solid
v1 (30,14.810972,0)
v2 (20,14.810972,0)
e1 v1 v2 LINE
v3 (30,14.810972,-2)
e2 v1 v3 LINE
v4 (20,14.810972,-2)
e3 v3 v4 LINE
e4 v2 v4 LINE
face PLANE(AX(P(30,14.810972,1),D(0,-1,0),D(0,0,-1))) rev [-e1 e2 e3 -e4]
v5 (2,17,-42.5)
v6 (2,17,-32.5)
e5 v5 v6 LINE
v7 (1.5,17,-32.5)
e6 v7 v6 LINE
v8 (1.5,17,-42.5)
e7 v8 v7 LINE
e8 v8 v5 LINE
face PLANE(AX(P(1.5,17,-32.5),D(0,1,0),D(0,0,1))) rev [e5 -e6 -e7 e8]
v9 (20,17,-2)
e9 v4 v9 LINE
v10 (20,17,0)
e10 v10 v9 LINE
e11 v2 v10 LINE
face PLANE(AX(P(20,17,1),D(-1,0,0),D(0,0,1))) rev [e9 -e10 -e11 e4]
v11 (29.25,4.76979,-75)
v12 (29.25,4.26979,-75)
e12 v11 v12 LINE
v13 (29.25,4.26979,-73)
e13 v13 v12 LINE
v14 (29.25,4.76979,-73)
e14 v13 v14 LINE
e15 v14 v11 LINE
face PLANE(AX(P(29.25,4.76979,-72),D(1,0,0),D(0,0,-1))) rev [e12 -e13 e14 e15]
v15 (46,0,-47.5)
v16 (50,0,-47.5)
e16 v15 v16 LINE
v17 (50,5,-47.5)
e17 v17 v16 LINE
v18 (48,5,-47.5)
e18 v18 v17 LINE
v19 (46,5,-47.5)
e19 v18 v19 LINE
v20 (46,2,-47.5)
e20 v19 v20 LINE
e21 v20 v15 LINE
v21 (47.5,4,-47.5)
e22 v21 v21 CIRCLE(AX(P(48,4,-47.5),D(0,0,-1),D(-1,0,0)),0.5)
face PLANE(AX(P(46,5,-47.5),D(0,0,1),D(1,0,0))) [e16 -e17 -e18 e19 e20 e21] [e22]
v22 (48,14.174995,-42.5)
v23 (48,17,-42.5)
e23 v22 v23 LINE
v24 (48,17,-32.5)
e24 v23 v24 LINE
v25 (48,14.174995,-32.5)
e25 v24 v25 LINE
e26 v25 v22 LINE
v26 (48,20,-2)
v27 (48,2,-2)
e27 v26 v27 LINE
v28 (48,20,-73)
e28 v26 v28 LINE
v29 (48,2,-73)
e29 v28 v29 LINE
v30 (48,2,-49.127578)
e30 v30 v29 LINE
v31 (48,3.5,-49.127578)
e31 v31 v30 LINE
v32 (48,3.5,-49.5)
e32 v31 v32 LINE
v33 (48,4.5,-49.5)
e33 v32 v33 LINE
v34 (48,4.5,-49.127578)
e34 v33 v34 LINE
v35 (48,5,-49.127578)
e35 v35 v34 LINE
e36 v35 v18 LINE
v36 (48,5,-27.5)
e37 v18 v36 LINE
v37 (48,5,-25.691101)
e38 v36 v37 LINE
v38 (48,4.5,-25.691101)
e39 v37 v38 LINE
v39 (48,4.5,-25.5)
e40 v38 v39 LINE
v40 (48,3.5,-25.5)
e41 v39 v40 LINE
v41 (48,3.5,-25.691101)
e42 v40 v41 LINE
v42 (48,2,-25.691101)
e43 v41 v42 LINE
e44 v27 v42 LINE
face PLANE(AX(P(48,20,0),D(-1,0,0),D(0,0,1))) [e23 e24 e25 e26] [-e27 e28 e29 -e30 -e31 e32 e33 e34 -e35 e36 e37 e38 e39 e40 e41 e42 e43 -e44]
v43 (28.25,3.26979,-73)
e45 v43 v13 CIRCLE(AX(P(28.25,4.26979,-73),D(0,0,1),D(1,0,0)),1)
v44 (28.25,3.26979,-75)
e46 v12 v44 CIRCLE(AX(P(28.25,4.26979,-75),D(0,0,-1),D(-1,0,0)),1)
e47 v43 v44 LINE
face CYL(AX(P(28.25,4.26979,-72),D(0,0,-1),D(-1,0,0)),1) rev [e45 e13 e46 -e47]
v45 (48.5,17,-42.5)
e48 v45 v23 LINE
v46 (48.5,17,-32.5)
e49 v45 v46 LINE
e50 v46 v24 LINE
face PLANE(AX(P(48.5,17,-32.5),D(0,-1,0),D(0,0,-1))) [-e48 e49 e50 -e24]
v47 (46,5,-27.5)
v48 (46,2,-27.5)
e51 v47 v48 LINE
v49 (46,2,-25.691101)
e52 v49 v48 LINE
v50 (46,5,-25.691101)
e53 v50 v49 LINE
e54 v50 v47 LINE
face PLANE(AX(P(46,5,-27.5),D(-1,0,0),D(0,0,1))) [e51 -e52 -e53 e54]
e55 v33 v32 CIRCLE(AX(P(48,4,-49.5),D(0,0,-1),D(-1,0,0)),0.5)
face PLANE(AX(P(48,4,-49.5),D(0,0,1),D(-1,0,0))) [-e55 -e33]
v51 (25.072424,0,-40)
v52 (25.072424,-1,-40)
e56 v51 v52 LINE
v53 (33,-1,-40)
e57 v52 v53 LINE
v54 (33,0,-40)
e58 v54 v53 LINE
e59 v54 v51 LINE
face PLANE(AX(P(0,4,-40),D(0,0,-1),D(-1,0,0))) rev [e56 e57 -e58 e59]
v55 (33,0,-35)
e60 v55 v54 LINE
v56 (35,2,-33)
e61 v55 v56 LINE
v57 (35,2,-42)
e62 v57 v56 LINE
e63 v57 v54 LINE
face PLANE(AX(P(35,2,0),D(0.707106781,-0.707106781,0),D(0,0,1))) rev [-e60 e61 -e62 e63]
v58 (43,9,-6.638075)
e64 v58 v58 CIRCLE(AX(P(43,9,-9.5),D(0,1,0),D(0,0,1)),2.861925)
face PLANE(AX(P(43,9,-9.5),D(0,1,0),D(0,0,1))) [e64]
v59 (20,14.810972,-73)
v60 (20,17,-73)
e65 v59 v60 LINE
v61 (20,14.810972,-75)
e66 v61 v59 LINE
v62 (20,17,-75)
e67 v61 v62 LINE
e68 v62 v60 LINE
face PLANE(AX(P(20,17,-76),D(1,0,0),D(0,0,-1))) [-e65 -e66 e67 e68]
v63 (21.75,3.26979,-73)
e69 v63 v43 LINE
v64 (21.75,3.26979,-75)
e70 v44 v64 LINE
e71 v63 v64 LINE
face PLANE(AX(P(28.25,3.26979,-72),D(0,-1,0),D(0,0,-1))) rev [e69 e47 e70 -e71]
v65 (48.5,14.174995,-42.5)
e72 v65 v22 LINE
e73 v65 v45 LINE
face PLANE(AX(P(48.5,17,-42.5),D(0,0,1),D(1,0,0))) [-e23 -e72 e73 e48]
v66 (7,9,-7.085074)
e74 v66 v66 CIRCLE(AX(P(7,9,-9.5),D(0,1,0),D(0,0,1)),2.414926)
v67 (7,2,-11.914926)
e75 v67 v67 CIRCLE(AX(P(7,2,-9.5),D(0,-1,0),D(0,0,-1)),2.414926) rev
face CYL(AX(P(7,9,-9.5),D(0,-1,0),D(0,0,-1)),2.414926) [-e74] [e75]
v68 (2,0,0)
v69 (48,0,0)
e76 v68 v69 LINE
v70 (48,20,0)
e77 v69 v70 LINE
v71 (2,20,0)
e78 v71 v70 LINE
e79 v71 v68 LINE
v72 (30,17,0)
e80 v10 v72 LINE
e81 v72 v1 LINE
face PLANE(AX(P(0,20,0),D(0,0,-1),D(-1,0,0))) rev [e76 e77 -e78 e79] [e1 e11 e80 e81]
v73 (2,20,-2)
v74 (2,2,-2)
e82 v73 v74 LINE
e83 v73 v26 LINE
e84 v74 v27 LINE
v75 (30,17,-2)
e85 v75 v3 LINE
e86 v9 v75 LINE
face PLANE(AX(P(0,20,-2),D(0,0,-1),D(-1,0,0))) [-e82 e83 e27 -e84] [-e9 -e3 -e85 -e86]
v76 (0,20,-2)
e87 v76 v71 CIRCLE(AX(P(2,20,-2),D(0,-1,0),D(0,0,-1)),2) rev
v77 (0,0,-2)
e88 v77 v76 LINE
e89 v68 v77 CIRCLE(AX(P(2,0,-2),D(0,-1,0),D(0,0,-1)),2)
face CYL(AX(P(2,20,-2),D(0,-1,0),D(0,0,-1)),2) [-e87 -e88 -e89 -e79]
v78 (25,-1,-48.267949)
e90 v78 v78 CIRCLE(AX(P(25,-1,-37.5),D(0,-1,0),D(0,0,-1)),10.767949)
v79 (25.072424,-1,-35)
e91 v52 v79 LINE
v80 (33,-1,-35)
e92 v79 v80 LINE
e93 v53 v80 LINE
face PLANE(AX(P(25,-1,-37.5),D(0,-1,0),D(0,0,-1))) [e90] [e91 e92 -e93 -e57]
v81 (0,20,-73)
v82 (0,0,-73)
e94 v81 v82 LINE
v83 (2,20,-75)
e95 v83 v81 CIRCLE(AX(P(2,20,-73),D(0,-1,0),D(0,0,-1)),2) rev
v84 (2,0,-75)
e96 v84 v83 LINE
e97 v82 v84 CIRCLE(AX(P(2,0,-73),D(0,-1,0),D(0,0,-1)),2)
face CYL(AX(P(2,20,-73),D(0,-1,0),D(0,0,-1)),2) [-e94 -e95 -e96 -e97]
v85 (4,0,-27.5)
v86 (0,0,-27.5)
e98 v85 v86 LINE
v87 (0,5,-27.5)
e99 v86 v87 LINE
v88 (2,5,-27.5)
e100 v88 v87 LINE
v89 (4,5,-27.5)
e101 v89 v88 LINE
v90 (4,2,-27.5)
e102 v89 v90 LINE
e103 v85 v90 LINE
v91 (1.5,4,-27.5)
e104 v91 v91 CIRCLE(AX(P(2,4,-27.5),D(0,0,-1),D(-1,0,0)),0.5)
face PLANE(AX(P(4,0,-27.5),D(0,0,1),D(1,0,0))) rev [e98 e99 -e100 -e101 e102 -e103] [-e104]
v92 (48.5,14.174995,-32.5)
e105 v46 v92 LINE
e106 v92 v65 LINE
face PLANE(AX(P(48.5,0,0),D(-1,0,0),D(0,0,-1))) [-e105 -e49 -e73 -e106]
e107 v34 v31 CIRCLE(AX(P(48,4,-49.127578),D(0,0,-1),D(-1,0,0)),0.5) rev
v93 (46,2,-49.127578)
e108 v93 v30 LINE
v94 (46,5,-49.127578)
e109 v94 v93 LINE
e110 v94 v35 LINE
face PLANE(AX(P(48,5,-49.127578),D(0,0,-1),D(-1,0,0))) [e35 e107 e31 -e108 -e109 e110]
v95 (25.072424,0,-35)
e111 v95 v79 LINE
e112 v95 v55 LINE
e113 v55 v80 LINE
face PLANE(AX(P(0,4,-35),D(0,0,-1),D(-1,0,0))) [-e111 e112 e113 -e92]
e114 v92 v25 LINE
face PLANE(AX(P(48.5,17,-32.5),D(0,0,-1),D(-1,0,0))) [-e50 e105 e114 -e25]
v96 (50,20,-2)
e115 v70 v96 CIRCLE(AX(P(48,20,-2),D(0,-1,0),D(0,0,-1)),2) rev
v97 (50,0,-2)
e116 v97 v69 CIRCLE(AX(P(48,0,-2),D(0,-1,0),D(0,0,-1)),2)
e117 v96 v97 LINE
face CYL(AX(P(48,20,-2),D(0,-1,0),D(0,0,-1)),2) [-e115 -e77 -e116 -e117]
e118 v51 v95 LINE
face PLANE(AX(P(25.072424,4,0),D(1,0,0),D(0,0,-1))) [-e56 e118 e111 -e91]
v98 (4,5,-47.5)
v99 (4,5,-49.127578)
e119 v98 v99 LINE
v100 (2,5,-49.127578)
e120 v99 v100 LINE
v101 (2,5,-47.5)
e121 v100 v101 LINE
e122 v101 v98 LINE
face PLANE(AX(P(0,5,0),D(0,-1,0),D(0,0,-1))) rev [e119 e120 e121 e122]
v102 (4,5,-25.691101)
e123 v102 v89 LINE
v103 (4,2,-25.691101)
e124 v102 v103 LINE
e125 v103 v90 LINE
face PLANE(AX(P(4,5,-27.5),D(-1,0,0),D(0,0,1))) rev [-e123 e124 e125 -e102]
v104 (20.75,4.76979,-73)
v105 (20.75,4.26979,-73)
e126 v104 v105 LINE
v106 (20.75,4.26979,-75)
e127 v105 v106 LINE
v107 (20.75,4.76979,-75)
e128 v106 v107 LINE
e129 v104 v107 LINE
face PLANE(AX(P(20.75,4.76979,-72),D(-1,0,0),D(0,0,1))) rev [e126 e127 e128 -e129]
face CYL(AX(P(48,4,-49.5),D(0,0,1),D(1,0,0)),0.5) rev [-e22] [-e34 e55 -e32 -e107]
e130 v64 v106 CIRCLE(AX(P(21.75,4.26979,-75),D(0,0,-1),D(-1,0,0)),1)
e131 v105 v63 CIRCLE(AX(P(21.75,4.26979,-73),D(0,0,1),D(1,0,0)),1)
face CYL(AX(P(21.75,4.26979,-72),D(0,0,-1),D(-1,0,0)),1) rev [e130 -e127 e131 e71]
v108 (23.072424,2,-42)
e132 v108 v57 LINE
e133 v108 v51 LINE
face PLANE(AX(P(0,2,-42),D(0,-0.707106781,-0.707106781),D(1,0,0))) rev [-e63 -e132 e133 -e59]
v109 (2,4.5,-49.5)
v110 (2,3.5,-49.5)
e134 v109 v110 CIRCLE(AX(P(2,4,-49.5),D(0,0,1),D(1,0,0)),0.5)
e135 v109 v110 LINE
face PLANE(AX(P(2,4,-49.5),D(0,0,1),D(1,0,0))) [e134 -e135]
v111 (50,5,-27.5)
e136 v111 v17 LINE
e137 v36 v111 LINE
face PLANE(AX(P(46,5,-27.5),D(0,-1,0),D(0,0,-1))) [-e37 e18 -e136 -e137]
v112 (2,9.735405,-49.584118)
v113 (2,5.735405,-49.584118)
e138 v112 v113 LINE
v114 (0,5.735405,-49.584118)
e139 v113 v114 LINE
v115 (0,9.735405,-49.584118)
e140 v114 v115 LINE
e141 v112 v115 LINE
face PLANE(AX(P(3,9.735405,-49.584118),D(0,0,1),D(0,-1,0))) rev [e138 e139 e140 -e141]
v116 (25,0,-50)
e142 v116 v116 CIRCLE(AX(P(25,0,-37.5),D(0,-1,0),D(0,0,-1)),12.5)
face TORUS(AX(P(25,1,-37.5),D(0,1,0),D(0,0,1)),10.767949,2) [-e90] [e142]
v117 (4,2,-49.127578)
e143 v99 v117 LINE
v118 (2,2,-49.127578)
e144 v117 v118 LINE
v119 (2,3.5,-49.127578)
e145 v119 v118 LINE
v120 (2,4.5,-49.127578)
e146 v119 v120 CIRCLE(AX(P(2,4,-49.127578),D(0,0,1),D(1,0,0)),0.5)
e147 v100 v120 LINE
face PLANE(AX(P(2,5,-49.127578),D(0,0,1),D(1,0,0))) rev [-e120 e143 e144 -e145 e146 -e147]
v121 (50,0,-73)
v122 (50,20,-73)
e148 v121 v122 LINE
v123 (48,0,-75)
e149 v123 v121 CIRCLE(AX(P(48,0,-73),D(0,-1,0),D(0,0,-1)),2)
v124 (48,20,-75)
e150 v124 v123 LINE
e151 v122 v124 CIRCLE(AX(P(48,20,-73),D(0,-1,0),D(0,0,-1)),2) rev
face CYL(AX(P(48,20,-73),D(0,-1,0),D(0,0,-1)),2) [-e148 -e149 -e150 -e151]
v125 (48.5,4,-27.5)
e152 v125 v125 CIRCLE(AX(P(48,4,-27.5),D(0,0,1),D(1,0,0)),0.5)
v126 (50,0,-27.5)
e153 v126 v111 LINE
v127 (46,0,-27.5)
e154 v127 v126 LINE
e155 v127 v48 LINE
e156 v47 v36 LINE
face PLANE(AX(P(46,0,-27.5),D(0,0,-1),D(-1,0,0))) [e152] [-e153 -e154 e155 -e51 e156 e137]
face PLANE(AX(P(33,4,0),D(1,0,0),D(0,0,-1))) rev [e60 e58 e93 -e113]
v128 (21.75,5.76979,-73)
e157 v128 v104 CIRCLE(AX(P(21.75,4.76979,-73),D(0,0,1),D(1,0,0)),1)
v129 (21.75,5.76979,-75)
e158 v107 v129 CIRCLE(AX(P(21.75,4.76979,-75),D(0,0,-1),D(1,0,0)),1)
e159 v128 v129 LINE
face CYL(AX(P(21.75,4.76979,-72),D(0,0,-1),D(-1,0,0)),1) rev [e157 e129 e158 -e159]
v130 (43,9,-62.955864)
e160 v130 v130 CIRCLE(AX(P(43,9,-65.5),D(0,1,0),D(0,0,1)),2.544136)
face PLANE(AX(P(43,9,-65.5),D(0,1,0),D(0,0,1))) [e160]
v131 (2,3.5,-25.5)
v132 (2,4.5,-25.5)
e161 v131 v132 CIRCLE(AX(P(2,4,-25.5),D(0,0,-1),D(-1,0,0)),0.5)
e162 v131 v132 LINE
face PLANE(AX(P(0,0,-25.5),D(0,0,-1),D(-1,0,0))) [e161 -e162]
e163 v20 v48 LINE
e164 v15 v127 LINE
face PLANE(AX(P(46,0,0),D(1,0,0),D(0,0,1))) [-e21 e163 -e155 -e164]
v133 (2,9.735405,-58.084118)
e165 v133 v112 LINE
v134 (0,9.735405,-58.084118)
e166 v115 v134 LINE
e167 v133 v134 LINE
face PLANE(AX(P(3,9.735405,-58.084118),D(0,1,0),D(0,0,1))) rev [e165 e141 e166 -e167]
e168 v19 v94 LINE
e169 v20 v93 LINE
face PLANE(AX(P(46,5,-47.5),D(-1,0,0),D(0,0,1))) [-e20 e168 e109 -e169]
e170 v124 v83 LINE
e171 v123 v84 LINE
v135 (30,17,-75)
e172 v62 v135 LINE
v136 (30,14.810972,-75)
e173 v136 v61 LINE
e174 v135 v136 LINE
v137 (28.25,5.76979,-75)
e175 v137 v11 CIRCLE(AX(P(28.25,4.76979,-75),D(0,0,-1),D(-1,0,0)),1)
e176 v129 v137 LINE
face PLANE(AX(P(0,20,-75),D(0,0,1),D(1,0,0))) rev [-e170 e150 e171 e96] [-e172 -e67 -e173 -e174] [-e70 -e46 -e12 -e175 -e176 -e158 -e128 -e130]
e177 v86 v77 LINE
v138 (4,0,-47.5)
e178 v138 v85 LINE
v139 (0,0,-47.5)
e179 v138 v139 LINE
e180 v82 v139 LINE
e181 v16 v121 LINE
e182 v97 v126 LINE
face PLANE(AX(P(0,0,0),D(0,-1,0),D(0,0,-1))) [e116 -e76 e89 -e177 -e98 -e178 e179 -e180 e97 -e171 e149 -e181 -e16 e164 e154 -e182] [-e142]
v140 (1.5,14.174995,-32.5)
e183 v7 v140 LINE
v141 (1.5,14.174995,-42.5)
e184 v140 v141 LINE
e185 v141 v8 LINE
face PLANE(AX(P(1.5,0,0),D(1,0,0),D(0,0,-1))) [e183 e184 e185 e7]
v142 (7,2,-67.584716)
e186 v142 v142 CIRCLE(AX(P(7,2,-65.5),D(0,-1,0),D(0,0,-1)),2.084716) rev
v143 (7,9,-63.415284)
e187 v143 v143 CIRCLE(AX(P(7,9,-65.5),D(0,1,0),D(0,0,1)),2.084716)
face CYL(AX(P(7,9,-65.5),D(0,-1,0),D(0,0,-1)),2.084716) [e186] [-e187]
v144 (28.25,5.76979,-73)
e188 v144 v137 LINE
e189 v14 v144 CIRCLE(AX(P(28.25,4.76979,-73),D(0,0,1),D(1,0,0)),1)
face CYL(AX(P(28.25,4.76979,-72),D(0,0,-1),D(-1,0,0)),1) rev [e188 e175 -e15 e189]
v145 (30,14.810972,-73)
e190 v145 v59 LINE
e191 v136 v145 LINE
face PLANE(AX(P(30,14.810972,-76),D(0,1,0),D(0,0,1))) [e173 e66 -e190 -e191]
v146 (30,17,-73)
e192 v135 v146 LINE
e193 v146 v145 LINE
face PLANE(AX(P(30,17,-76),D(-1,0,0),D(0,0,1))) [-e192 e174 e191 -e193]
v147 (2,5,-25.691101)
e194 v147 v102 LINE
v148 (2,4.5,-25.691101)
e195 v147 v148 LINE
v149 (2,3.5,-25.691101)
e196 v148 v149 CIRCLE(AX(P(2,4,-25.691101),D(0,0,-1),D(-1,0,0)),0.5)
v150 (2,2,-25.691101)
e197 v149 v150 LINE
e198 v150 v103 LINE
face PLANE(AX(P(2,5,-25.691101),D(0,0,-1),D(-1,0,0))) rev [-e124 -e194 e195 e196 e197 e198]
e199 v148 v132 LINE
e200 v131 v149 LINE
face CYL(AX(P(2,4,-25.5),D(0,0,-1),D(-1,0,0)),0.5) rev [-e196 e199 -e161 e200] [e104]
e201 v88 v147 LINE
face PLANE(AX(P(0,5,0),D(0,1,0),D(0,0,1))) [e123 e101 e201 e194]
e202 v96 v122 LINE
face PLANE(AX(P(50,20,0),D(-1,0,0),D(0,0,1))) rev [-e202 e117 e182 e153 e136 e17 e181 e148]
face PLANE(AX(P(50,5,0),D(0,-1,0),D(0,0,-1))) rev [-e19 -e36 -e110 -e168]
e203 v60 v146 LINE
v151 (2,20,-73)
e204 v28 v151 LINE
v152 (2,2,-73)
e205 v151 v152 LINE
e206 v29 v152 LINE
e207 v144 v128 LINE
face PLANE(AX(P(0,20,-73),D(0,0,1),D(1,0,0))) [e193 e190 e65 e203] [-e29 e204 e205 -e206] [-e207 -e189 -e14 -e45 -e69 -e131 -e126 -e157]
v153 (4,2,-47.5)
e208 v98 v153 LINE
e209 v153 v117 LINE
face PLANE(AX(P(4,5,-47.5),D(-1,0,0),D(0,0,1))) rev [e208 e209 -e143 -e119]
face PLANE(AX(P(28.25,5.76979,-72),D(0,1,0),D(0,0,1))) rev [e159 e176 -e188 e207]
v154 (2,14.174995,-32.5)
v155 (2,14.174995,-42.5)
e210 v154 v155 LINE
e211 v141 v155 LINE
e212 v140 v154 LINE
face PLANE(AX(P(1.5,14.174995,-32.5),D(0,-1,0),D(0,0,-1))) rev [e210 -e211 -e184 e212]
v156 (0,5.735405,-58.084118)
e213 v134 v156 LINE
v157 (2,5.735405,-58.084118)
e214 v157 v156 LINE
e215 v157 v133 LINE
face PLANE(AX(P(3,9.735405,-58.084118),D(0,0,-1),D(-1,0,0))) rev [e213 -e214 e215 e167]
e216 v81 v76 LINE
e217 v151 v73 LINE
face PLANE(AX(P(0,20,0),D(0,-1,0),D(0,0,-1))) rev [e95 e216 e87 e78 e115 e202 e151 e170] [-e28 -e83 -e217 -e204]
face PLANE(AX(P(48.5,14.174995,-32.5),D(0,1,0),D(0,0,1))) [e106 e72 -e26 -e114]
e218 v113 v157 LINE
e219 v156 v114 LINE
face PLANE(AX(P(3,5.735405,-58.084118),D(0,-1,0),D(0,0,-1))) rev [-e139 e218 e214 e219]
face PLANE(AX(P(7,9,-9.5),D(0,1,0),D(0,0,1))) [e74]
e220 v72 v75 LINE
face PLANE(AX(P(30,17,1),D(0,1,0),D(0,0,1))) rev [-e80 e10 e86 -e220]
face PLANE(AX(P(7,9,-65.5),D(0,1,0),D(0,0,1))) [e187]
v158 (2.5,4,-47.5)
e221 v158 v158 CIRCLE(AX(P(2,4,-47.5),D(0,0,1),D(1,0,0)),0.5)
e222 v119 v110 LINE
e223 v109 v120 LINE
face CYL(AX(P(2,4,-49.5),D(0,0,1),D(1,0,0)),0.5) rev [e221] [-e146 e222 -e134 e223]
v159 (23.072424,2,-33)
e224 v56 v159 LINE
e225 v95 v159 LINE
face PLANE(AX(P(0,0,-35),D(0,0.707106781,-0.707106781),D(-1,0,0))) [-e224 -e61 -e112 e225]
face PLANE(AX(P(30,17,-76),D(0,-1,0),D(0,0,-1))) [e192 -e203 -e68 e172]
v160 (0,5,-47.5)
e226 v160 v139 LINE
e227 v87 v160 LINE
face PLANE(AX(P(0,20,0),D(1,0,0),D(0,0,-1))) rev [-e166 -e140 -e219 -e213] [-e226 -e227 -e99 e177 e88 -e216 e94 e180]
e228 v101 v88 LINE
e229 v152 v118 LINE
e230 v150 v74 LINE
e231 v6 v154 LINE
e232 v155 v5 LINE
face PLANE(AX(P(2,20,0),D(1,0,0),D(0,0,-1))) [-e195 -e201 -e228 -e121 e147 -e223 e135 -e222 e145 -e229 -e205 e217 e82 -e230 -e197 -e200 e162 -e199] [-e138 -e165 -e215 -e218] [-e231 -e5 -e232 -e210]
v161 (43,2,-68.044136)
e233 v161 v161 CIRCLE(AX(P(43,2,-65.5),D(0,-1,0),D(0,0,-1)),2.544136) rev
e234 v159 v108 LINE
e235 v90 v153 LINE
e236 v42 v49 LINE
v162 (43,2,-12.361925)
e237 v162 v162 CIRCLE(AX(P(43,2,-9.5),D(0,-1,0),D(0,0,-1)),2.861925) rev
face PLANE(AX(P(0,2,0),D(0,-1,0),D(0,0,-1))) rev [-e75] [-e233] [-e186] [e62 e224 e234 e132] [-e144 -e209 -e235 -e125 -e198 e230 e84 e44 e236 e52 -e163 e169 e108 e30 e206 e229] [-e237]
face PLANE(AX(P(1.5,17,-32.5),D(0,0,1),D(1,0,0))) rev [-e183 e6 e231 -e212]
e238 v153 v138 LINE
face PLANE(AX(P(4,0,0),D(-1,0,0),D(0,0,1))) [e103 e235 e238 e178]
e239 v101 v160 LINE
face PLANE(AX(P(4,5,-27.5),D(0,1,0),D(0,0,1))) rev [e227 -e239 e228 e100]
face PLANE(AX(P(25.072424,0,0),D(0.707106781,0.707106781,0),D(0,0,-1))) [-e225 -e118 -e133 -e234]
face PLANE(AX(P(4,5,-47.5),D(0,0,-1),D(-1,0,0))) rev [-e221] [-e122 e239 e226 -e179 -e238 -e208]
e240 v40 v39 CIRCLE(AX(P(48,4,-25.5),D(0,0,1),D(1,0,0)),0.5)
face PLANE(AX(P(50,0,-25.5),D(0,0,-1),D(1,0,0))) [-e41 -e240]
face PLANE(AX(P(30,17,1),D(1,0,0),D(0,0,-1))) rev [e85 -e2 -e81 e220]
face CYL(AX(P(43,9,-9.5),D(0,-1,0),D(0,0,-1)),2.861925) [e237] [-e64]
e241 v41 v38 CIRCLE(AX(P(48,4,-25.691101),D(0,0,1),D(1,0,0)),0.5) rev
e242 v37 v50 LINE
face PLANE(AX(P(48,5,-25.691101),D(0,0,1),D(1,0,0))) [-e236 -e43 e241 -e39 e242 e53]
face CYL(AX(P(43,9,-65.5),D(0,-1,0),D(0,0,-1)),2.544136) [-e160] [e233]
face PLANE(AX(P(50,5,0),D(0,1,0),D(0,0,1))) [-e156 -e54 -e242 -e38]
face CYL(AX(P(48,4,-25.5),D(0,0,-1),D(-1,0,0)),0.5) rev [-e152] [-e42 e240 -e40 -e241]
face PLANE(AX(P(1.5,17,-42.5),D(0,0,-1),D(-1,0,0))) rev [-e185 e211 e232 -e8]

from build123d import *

# Parameters (mm, degrees)
SKETCH1_W           = 50
SKETCH1_H           = 75
BOSS_EXTRUDE1_DEPTH = 20
SHELL1_T            = -2
FILLET1_R           = 2
SKETCH2_R           = 12.5
BOSS_EXTRUDE2_DEPTH = 1
FILLET2_R           = 2
CUT_EXTRUDE1_DEPTH  = 5
SKETCH4_R           = 2.084715902
SKETCH4_R_2         = 2.544136108
SKETCH4_R_3         = 2.861924979
SKETCH4_R_4         = 2.414925707
BOSS_EXTRUDE3_DEPTH = 7
CHAMFER1_SIZE       = 2
CUT_EXTRUDE2_DEPTH  = 4
SKETCH7_W           = 2
SKETCH7_H           = 1.627577662
BOSS_EXTRUDE4_DEPTH = 3
SKETCH8_W           = 2
SKETCH8_H           = 1.808898565
BOSS_EXTRUDE5_DEPTH = 3
SKETCH9_R           = 0.5
CUT_EXTRUDE3_DEPTH  = 2
CUT_EXTRUDE4_START  = -2
CUT_EXTRUDE4_DEPTH  = 2
SKETCH12_W          = 8.5
SKETCH12_H          = 4
CUT_EXTRUDE5_DEPTH  = 3
SKETCH14_W          = 10
SKETCH14_H          = 2.18902829
CUT_EXTRUDE7_DEPTH  = 3
SKETCH15_W          = 10
SKETCH15_H          = 2.825004844
CUT_EXTRUDE8_DEPTH  = 0.5
CUT_EXTRUDE9_DEPTH  = 3


with BuildPart() as part:
    # Sketch1 → Boss-Extrude1 (new body)
    with BuildSketch(Plane(origin=(0, 0, 0), x_dir=(1, 0, 0), z_dir=(0, 1, 0))):
        with Locations((25, 37.5)):
            Rectangle(SKETCH1_W, SKETCH1_H)
    extrude(amount=BOSS_EXTRUDE1_DEPTH)

    # Shell1
    shell1_openings = [part.faces().sort_by_distance(p)[0] for p in [
        (25, 20, -37.5),
    ]]
    offset(amount=SHELL1_T, openings=shell1_openings, kind=Kind.INTERSECTION)

    # Fillet1
    fillet1_edges = [part.edges().sort_by_distance(p)[0] for p in [
        (0, 10, -75),
        (50, 10, -75),
        (50, 10, 0),
        (0, 10, 0),
    ]]
    fillet(fillet1_edges, radius=FILLET1_R)

    # Sketch2 → Boss-Extrude2 (add)
    with BuildSketch(Plane.XZ):
        with Locations(Location((25, -37.5, 0), (0, 0, 270))):
            Circle(SKETCH2_R)
    extrude(amount=BOSS_EXTRUDE2_DEPTH)

    # Fillet2
    # the kernel refuses this fillet: 2 mm, written as the material it takes off along each edge
    with BuildSketch(Plane(origin=(25, -1, -37.5), x_dir=(0, 0, -1), z_dir=(-1, 0, 0))) as fillet2_piece_1:
        with BuildLine():
            CenterArc((10.767949192, -2), FILLET2_R, 30, 60)
            Line((10.767949192, 0), (10.767949192, 0.04))
            Line((10.767949192, 0.04), (12.5, 0.04))
            Line((12.5, 0.04), (12.54, 0))
            ThreePointArc((12.54, 0), (12.54, -0.5), (12.534641016, -0.98))
            Line((12.534641016, -0.98), (12.5, -1))
        make_face()
    revolve(axis=Axis((25, -1, -37.5), (0, -1, 0)), mode=Mode.SUBTRACT)

    # Sketch3 → Cut-Extrude1 (cut)
    with BuildSketch(Plane.XZ.offset(1)):
        Polygon((33, -40), (33, -37.5), (33, -35), (25.072423756, -35), (25.072423756, -37.5), (25.072423756, -40), align=None)
    extrude(amount=-CUT_EXTRUDE1_DEPTH, mode=Mode.SUBTRACT)

    # Sketch4 → Boss-Extrude3 (add)
    with BuildSketch(Plane(origin=(0, 2, 0), x_dir=(1, 0, 0), z_dir=(0, 1, 0))):
        with Locations(Location((7, 65.5, 0), (0, 0, 90))):
            Circle(SKETCH4_R)
        with Locations(Location((43, 65.5, 0), (0, 0, 90))):
            Circle(SKETCH4_R_2)
        with Locations(Location((43, 9.5, 0), (0, 0, 90))):
            Circle(SKETCH4_R_3)
        with Locations(Location((7, 9.5, 0), (0, 0, 90))):
            Circle(SKETCH4_R_4)
    extrude(amount=BOSS_EXTRUDE3_DEPTH)

    # Chamfer1
    chamfer1_edges = [part.edges().sort_by_distance(p)[0] for p in [
        (33, 2, -37.5),
        (29.036211878, 2, -40),
        (29.036211878, 2, -35),
        (25.072423756, 2, -37.5),
    ]]
    chamfer(chamfer1_edges, length=CHAMFER1_SIZE)

    # Sketch5 → Cut-Extrude2 (cut)
    with BuildSketch(Plane.ZY):
        Polygon((-37.5, 0), (-27.5, 0), (-27.5, 5), (-47.5, 5), (-47.5, 0), align=None)
    cut_extrude2 = extrude(amount=-CUT_EXTRUDE2_DEPTH, mode=Mode.SUBTRACT)

    # Sketch7 → Boss-Extrude4 (add)
    with BuildSketch(Plane(origin=(0, 2, 0), x_dir=(1, 0, 0), z_dir=(0, 1, 0))):
        with Locations((3, 48.313788831)):
            Rectangle(SKETCH7_W, SKETCH7_H)
    boss_extrude4 = extrude(amount=BOSS_EXTRUDE4_DEPTH)

    # Sketch8 → Boss-Extrude5 (add)
    with BuildSketch(Plane(origin=(0, 2, 0), x_dir=(1, 0, 0), z_dir=(0, 1, 0))):
        with Locations((3, 26.595550718)):
            Rectangle(SKETCH8_W, SKETCH8_H)
    boss_extrude5 = extrude(amount=BOSS_EXTRUDE5_DEPTH)

    # Sketch9 → Cut-Extrude3 (cut)
    with BuildSketch(Plane.XY.offset(-47.5)):
        with Locations((2, 4)):
            Circle(SKETCH9_R)
    cut_extrude3 = extrude(amount=-CUT_EXTRUDE3_DEPTH, mode=Mode.SUBTRACT)

    # Sketch10 → Cut-Extrude4 (cut)
    with BuildSketch(Plane(origin=(0, 0, -27.5), x_dir=(-1, 0, 0), z_dir=(0, 0, -1)).offset(CUT_EXTRUDE4_START)):
        with BuildLine():
            ThreePointArc((-1.5, 4), (-1.646446609, 4.353553391), (-2, 4.5))
            Line((-2, 4.5), (-2, 3.5))
            ThreePointArc((-2, 3.5), (-1.646446609, 3.646446609), (-1.5, 4))
        make_face()
        with BuildLine():
            Line((-2, 3.5), (-2, 4.5))
            ThreePointArc((-2, 4.5), (-2.5, 4), (-2, 3.5))
        make_face()
    cut_extrude4 = extrude(amount=CUT_EXTRUDE4_DEPTH, mode=Mode.SUBTRACT)

    # Mirror1: Cut-Extrude2, Boss-Extrude4, Boss-Extrude5, Cut-Extrude3, Cut-Extrude4 across plane
    add(cut_extrude2.mirror(Plane(origin=(25, 0, 0), x_dir=(0, 0, 1), z_dir=(1, 0, 0))), mode=Mode.SUBTRACT)
    add(boss_extrude4.mirror(Plane(origin=(25, 0, 0), x_dir=(0, 0, 1), z_dir=(1, 0, 0))))
    add(boss_extrude5.mirror(Plane(origin=(25, 0, 0), x_dir=(0, 0, 1), z_dir=(1, 0, 0))))
    add(cut_extrude3.mirror(Plane(origin=(25, 0, 0), x_dir=(0, 0, 1), z_dir=(1, 0, 0))), mode=Mode.SUBTRACT)
    add(cut_extrude4.mirror(Plane(origin=(25, 0, 0), x_dir=(0, 0, 1), z_dir=(1, 0, 0))), mode=Mode.SUBTRACT)

    # Sketch12 → Cut-Extrude5 (cut)
    with BuildSketch(Plane.ZY):
        with Locations((-53.834118064, 7.735405472)):
            Rectangle(SKETCH12_W, SKETCH12_H)
    extrude(amount=-CUT_EXTRUDE5_DEPTH, mode=Mode.SUBTRACT)

    # Sketch14 → Cut-Extrude7 (cut)
    with BuildSketch(Plane(origin=(0, 0, -2), x_dir=(-1, 0, 0), z_dir=(0, 0, -1))):
        with Locations((-25, 15.905485855)):
            Rectangle(SKETCH14_W, SKETCH14_H)
    cut_extrude7 = extrude(amount=-CUT_EXTRUDE7_DEPTH, mode=Mode.SUBTRACT)

    # Sketch15 → Cut-Extrude8 (cut)
    with BuildSketch(Plane(origin=(2, 0, 0), x_dir=(0, 0, -1), z_dir=(1, 0, 0))):
        with Locations((37.5, 15.587497578)):
            Rectangle(SKETCH15_W, SKETCH15_H)
    cut_extrude8 = extrude(amount=-CUT_EXTRUDE8_DEPTH, mode=Mode.SUBTRACT)

    # Mirror2: Cut-Extrude7 across plane
    add(cut_extrude7.mirror(Plane.XY.offset(-37.5)), mode=Mode.SUBTRACT)

    # Mirror3: Cut-Extrude8 across plane
    add(cut_extrude8.mirror(Plane(origin=(25, 0, 0), x_dir=(0, 0, 1), z_dir=(1, 0, 0))), mode=Mode.SUBTRACT)

    # Sketch16 → Cut-Extrude9 (cut)
    with BuildSketch(Plane(origin=(0, 0, -75), x_dir=(-1, 0, 0), z_dir=(0, 0, -1))):
        with BuildLine():
            Line((-28.25, 5.769790366), (-21.75, 5.769790366))
            ThreePointArc((-21.75, 5.769790366), (-21.042893219, 5.476897147), (-20.75, 4.769790366))
            Line((-20.75, 4.769790366), (-20.75, 4.269790366))
            ThreePointArc((-20.75, 4.269790366), (-21.042893219, 3.562683585), (-21.75, 3.269790366))
            Line((-21.75, 3.269790366), (-28.25, 3.269790366))
            ThreePointArc((-28.25, 3.269790366), (-28.957106781, 3.562683585), (-29.25, 4.269790366))
            Line((-29.25, 4.269790366), (-29.25, 4.769790366))
            ThreePointArc((-29.25, 4.769790366), (-28.957106781, 5.476897147), (-28.25, 5.769790366))
        make_face()
    extrude(amount=-CUT_EXTRUDE9_DEPTH, mode=Mode.SUBTRACT)


solid = part.part
